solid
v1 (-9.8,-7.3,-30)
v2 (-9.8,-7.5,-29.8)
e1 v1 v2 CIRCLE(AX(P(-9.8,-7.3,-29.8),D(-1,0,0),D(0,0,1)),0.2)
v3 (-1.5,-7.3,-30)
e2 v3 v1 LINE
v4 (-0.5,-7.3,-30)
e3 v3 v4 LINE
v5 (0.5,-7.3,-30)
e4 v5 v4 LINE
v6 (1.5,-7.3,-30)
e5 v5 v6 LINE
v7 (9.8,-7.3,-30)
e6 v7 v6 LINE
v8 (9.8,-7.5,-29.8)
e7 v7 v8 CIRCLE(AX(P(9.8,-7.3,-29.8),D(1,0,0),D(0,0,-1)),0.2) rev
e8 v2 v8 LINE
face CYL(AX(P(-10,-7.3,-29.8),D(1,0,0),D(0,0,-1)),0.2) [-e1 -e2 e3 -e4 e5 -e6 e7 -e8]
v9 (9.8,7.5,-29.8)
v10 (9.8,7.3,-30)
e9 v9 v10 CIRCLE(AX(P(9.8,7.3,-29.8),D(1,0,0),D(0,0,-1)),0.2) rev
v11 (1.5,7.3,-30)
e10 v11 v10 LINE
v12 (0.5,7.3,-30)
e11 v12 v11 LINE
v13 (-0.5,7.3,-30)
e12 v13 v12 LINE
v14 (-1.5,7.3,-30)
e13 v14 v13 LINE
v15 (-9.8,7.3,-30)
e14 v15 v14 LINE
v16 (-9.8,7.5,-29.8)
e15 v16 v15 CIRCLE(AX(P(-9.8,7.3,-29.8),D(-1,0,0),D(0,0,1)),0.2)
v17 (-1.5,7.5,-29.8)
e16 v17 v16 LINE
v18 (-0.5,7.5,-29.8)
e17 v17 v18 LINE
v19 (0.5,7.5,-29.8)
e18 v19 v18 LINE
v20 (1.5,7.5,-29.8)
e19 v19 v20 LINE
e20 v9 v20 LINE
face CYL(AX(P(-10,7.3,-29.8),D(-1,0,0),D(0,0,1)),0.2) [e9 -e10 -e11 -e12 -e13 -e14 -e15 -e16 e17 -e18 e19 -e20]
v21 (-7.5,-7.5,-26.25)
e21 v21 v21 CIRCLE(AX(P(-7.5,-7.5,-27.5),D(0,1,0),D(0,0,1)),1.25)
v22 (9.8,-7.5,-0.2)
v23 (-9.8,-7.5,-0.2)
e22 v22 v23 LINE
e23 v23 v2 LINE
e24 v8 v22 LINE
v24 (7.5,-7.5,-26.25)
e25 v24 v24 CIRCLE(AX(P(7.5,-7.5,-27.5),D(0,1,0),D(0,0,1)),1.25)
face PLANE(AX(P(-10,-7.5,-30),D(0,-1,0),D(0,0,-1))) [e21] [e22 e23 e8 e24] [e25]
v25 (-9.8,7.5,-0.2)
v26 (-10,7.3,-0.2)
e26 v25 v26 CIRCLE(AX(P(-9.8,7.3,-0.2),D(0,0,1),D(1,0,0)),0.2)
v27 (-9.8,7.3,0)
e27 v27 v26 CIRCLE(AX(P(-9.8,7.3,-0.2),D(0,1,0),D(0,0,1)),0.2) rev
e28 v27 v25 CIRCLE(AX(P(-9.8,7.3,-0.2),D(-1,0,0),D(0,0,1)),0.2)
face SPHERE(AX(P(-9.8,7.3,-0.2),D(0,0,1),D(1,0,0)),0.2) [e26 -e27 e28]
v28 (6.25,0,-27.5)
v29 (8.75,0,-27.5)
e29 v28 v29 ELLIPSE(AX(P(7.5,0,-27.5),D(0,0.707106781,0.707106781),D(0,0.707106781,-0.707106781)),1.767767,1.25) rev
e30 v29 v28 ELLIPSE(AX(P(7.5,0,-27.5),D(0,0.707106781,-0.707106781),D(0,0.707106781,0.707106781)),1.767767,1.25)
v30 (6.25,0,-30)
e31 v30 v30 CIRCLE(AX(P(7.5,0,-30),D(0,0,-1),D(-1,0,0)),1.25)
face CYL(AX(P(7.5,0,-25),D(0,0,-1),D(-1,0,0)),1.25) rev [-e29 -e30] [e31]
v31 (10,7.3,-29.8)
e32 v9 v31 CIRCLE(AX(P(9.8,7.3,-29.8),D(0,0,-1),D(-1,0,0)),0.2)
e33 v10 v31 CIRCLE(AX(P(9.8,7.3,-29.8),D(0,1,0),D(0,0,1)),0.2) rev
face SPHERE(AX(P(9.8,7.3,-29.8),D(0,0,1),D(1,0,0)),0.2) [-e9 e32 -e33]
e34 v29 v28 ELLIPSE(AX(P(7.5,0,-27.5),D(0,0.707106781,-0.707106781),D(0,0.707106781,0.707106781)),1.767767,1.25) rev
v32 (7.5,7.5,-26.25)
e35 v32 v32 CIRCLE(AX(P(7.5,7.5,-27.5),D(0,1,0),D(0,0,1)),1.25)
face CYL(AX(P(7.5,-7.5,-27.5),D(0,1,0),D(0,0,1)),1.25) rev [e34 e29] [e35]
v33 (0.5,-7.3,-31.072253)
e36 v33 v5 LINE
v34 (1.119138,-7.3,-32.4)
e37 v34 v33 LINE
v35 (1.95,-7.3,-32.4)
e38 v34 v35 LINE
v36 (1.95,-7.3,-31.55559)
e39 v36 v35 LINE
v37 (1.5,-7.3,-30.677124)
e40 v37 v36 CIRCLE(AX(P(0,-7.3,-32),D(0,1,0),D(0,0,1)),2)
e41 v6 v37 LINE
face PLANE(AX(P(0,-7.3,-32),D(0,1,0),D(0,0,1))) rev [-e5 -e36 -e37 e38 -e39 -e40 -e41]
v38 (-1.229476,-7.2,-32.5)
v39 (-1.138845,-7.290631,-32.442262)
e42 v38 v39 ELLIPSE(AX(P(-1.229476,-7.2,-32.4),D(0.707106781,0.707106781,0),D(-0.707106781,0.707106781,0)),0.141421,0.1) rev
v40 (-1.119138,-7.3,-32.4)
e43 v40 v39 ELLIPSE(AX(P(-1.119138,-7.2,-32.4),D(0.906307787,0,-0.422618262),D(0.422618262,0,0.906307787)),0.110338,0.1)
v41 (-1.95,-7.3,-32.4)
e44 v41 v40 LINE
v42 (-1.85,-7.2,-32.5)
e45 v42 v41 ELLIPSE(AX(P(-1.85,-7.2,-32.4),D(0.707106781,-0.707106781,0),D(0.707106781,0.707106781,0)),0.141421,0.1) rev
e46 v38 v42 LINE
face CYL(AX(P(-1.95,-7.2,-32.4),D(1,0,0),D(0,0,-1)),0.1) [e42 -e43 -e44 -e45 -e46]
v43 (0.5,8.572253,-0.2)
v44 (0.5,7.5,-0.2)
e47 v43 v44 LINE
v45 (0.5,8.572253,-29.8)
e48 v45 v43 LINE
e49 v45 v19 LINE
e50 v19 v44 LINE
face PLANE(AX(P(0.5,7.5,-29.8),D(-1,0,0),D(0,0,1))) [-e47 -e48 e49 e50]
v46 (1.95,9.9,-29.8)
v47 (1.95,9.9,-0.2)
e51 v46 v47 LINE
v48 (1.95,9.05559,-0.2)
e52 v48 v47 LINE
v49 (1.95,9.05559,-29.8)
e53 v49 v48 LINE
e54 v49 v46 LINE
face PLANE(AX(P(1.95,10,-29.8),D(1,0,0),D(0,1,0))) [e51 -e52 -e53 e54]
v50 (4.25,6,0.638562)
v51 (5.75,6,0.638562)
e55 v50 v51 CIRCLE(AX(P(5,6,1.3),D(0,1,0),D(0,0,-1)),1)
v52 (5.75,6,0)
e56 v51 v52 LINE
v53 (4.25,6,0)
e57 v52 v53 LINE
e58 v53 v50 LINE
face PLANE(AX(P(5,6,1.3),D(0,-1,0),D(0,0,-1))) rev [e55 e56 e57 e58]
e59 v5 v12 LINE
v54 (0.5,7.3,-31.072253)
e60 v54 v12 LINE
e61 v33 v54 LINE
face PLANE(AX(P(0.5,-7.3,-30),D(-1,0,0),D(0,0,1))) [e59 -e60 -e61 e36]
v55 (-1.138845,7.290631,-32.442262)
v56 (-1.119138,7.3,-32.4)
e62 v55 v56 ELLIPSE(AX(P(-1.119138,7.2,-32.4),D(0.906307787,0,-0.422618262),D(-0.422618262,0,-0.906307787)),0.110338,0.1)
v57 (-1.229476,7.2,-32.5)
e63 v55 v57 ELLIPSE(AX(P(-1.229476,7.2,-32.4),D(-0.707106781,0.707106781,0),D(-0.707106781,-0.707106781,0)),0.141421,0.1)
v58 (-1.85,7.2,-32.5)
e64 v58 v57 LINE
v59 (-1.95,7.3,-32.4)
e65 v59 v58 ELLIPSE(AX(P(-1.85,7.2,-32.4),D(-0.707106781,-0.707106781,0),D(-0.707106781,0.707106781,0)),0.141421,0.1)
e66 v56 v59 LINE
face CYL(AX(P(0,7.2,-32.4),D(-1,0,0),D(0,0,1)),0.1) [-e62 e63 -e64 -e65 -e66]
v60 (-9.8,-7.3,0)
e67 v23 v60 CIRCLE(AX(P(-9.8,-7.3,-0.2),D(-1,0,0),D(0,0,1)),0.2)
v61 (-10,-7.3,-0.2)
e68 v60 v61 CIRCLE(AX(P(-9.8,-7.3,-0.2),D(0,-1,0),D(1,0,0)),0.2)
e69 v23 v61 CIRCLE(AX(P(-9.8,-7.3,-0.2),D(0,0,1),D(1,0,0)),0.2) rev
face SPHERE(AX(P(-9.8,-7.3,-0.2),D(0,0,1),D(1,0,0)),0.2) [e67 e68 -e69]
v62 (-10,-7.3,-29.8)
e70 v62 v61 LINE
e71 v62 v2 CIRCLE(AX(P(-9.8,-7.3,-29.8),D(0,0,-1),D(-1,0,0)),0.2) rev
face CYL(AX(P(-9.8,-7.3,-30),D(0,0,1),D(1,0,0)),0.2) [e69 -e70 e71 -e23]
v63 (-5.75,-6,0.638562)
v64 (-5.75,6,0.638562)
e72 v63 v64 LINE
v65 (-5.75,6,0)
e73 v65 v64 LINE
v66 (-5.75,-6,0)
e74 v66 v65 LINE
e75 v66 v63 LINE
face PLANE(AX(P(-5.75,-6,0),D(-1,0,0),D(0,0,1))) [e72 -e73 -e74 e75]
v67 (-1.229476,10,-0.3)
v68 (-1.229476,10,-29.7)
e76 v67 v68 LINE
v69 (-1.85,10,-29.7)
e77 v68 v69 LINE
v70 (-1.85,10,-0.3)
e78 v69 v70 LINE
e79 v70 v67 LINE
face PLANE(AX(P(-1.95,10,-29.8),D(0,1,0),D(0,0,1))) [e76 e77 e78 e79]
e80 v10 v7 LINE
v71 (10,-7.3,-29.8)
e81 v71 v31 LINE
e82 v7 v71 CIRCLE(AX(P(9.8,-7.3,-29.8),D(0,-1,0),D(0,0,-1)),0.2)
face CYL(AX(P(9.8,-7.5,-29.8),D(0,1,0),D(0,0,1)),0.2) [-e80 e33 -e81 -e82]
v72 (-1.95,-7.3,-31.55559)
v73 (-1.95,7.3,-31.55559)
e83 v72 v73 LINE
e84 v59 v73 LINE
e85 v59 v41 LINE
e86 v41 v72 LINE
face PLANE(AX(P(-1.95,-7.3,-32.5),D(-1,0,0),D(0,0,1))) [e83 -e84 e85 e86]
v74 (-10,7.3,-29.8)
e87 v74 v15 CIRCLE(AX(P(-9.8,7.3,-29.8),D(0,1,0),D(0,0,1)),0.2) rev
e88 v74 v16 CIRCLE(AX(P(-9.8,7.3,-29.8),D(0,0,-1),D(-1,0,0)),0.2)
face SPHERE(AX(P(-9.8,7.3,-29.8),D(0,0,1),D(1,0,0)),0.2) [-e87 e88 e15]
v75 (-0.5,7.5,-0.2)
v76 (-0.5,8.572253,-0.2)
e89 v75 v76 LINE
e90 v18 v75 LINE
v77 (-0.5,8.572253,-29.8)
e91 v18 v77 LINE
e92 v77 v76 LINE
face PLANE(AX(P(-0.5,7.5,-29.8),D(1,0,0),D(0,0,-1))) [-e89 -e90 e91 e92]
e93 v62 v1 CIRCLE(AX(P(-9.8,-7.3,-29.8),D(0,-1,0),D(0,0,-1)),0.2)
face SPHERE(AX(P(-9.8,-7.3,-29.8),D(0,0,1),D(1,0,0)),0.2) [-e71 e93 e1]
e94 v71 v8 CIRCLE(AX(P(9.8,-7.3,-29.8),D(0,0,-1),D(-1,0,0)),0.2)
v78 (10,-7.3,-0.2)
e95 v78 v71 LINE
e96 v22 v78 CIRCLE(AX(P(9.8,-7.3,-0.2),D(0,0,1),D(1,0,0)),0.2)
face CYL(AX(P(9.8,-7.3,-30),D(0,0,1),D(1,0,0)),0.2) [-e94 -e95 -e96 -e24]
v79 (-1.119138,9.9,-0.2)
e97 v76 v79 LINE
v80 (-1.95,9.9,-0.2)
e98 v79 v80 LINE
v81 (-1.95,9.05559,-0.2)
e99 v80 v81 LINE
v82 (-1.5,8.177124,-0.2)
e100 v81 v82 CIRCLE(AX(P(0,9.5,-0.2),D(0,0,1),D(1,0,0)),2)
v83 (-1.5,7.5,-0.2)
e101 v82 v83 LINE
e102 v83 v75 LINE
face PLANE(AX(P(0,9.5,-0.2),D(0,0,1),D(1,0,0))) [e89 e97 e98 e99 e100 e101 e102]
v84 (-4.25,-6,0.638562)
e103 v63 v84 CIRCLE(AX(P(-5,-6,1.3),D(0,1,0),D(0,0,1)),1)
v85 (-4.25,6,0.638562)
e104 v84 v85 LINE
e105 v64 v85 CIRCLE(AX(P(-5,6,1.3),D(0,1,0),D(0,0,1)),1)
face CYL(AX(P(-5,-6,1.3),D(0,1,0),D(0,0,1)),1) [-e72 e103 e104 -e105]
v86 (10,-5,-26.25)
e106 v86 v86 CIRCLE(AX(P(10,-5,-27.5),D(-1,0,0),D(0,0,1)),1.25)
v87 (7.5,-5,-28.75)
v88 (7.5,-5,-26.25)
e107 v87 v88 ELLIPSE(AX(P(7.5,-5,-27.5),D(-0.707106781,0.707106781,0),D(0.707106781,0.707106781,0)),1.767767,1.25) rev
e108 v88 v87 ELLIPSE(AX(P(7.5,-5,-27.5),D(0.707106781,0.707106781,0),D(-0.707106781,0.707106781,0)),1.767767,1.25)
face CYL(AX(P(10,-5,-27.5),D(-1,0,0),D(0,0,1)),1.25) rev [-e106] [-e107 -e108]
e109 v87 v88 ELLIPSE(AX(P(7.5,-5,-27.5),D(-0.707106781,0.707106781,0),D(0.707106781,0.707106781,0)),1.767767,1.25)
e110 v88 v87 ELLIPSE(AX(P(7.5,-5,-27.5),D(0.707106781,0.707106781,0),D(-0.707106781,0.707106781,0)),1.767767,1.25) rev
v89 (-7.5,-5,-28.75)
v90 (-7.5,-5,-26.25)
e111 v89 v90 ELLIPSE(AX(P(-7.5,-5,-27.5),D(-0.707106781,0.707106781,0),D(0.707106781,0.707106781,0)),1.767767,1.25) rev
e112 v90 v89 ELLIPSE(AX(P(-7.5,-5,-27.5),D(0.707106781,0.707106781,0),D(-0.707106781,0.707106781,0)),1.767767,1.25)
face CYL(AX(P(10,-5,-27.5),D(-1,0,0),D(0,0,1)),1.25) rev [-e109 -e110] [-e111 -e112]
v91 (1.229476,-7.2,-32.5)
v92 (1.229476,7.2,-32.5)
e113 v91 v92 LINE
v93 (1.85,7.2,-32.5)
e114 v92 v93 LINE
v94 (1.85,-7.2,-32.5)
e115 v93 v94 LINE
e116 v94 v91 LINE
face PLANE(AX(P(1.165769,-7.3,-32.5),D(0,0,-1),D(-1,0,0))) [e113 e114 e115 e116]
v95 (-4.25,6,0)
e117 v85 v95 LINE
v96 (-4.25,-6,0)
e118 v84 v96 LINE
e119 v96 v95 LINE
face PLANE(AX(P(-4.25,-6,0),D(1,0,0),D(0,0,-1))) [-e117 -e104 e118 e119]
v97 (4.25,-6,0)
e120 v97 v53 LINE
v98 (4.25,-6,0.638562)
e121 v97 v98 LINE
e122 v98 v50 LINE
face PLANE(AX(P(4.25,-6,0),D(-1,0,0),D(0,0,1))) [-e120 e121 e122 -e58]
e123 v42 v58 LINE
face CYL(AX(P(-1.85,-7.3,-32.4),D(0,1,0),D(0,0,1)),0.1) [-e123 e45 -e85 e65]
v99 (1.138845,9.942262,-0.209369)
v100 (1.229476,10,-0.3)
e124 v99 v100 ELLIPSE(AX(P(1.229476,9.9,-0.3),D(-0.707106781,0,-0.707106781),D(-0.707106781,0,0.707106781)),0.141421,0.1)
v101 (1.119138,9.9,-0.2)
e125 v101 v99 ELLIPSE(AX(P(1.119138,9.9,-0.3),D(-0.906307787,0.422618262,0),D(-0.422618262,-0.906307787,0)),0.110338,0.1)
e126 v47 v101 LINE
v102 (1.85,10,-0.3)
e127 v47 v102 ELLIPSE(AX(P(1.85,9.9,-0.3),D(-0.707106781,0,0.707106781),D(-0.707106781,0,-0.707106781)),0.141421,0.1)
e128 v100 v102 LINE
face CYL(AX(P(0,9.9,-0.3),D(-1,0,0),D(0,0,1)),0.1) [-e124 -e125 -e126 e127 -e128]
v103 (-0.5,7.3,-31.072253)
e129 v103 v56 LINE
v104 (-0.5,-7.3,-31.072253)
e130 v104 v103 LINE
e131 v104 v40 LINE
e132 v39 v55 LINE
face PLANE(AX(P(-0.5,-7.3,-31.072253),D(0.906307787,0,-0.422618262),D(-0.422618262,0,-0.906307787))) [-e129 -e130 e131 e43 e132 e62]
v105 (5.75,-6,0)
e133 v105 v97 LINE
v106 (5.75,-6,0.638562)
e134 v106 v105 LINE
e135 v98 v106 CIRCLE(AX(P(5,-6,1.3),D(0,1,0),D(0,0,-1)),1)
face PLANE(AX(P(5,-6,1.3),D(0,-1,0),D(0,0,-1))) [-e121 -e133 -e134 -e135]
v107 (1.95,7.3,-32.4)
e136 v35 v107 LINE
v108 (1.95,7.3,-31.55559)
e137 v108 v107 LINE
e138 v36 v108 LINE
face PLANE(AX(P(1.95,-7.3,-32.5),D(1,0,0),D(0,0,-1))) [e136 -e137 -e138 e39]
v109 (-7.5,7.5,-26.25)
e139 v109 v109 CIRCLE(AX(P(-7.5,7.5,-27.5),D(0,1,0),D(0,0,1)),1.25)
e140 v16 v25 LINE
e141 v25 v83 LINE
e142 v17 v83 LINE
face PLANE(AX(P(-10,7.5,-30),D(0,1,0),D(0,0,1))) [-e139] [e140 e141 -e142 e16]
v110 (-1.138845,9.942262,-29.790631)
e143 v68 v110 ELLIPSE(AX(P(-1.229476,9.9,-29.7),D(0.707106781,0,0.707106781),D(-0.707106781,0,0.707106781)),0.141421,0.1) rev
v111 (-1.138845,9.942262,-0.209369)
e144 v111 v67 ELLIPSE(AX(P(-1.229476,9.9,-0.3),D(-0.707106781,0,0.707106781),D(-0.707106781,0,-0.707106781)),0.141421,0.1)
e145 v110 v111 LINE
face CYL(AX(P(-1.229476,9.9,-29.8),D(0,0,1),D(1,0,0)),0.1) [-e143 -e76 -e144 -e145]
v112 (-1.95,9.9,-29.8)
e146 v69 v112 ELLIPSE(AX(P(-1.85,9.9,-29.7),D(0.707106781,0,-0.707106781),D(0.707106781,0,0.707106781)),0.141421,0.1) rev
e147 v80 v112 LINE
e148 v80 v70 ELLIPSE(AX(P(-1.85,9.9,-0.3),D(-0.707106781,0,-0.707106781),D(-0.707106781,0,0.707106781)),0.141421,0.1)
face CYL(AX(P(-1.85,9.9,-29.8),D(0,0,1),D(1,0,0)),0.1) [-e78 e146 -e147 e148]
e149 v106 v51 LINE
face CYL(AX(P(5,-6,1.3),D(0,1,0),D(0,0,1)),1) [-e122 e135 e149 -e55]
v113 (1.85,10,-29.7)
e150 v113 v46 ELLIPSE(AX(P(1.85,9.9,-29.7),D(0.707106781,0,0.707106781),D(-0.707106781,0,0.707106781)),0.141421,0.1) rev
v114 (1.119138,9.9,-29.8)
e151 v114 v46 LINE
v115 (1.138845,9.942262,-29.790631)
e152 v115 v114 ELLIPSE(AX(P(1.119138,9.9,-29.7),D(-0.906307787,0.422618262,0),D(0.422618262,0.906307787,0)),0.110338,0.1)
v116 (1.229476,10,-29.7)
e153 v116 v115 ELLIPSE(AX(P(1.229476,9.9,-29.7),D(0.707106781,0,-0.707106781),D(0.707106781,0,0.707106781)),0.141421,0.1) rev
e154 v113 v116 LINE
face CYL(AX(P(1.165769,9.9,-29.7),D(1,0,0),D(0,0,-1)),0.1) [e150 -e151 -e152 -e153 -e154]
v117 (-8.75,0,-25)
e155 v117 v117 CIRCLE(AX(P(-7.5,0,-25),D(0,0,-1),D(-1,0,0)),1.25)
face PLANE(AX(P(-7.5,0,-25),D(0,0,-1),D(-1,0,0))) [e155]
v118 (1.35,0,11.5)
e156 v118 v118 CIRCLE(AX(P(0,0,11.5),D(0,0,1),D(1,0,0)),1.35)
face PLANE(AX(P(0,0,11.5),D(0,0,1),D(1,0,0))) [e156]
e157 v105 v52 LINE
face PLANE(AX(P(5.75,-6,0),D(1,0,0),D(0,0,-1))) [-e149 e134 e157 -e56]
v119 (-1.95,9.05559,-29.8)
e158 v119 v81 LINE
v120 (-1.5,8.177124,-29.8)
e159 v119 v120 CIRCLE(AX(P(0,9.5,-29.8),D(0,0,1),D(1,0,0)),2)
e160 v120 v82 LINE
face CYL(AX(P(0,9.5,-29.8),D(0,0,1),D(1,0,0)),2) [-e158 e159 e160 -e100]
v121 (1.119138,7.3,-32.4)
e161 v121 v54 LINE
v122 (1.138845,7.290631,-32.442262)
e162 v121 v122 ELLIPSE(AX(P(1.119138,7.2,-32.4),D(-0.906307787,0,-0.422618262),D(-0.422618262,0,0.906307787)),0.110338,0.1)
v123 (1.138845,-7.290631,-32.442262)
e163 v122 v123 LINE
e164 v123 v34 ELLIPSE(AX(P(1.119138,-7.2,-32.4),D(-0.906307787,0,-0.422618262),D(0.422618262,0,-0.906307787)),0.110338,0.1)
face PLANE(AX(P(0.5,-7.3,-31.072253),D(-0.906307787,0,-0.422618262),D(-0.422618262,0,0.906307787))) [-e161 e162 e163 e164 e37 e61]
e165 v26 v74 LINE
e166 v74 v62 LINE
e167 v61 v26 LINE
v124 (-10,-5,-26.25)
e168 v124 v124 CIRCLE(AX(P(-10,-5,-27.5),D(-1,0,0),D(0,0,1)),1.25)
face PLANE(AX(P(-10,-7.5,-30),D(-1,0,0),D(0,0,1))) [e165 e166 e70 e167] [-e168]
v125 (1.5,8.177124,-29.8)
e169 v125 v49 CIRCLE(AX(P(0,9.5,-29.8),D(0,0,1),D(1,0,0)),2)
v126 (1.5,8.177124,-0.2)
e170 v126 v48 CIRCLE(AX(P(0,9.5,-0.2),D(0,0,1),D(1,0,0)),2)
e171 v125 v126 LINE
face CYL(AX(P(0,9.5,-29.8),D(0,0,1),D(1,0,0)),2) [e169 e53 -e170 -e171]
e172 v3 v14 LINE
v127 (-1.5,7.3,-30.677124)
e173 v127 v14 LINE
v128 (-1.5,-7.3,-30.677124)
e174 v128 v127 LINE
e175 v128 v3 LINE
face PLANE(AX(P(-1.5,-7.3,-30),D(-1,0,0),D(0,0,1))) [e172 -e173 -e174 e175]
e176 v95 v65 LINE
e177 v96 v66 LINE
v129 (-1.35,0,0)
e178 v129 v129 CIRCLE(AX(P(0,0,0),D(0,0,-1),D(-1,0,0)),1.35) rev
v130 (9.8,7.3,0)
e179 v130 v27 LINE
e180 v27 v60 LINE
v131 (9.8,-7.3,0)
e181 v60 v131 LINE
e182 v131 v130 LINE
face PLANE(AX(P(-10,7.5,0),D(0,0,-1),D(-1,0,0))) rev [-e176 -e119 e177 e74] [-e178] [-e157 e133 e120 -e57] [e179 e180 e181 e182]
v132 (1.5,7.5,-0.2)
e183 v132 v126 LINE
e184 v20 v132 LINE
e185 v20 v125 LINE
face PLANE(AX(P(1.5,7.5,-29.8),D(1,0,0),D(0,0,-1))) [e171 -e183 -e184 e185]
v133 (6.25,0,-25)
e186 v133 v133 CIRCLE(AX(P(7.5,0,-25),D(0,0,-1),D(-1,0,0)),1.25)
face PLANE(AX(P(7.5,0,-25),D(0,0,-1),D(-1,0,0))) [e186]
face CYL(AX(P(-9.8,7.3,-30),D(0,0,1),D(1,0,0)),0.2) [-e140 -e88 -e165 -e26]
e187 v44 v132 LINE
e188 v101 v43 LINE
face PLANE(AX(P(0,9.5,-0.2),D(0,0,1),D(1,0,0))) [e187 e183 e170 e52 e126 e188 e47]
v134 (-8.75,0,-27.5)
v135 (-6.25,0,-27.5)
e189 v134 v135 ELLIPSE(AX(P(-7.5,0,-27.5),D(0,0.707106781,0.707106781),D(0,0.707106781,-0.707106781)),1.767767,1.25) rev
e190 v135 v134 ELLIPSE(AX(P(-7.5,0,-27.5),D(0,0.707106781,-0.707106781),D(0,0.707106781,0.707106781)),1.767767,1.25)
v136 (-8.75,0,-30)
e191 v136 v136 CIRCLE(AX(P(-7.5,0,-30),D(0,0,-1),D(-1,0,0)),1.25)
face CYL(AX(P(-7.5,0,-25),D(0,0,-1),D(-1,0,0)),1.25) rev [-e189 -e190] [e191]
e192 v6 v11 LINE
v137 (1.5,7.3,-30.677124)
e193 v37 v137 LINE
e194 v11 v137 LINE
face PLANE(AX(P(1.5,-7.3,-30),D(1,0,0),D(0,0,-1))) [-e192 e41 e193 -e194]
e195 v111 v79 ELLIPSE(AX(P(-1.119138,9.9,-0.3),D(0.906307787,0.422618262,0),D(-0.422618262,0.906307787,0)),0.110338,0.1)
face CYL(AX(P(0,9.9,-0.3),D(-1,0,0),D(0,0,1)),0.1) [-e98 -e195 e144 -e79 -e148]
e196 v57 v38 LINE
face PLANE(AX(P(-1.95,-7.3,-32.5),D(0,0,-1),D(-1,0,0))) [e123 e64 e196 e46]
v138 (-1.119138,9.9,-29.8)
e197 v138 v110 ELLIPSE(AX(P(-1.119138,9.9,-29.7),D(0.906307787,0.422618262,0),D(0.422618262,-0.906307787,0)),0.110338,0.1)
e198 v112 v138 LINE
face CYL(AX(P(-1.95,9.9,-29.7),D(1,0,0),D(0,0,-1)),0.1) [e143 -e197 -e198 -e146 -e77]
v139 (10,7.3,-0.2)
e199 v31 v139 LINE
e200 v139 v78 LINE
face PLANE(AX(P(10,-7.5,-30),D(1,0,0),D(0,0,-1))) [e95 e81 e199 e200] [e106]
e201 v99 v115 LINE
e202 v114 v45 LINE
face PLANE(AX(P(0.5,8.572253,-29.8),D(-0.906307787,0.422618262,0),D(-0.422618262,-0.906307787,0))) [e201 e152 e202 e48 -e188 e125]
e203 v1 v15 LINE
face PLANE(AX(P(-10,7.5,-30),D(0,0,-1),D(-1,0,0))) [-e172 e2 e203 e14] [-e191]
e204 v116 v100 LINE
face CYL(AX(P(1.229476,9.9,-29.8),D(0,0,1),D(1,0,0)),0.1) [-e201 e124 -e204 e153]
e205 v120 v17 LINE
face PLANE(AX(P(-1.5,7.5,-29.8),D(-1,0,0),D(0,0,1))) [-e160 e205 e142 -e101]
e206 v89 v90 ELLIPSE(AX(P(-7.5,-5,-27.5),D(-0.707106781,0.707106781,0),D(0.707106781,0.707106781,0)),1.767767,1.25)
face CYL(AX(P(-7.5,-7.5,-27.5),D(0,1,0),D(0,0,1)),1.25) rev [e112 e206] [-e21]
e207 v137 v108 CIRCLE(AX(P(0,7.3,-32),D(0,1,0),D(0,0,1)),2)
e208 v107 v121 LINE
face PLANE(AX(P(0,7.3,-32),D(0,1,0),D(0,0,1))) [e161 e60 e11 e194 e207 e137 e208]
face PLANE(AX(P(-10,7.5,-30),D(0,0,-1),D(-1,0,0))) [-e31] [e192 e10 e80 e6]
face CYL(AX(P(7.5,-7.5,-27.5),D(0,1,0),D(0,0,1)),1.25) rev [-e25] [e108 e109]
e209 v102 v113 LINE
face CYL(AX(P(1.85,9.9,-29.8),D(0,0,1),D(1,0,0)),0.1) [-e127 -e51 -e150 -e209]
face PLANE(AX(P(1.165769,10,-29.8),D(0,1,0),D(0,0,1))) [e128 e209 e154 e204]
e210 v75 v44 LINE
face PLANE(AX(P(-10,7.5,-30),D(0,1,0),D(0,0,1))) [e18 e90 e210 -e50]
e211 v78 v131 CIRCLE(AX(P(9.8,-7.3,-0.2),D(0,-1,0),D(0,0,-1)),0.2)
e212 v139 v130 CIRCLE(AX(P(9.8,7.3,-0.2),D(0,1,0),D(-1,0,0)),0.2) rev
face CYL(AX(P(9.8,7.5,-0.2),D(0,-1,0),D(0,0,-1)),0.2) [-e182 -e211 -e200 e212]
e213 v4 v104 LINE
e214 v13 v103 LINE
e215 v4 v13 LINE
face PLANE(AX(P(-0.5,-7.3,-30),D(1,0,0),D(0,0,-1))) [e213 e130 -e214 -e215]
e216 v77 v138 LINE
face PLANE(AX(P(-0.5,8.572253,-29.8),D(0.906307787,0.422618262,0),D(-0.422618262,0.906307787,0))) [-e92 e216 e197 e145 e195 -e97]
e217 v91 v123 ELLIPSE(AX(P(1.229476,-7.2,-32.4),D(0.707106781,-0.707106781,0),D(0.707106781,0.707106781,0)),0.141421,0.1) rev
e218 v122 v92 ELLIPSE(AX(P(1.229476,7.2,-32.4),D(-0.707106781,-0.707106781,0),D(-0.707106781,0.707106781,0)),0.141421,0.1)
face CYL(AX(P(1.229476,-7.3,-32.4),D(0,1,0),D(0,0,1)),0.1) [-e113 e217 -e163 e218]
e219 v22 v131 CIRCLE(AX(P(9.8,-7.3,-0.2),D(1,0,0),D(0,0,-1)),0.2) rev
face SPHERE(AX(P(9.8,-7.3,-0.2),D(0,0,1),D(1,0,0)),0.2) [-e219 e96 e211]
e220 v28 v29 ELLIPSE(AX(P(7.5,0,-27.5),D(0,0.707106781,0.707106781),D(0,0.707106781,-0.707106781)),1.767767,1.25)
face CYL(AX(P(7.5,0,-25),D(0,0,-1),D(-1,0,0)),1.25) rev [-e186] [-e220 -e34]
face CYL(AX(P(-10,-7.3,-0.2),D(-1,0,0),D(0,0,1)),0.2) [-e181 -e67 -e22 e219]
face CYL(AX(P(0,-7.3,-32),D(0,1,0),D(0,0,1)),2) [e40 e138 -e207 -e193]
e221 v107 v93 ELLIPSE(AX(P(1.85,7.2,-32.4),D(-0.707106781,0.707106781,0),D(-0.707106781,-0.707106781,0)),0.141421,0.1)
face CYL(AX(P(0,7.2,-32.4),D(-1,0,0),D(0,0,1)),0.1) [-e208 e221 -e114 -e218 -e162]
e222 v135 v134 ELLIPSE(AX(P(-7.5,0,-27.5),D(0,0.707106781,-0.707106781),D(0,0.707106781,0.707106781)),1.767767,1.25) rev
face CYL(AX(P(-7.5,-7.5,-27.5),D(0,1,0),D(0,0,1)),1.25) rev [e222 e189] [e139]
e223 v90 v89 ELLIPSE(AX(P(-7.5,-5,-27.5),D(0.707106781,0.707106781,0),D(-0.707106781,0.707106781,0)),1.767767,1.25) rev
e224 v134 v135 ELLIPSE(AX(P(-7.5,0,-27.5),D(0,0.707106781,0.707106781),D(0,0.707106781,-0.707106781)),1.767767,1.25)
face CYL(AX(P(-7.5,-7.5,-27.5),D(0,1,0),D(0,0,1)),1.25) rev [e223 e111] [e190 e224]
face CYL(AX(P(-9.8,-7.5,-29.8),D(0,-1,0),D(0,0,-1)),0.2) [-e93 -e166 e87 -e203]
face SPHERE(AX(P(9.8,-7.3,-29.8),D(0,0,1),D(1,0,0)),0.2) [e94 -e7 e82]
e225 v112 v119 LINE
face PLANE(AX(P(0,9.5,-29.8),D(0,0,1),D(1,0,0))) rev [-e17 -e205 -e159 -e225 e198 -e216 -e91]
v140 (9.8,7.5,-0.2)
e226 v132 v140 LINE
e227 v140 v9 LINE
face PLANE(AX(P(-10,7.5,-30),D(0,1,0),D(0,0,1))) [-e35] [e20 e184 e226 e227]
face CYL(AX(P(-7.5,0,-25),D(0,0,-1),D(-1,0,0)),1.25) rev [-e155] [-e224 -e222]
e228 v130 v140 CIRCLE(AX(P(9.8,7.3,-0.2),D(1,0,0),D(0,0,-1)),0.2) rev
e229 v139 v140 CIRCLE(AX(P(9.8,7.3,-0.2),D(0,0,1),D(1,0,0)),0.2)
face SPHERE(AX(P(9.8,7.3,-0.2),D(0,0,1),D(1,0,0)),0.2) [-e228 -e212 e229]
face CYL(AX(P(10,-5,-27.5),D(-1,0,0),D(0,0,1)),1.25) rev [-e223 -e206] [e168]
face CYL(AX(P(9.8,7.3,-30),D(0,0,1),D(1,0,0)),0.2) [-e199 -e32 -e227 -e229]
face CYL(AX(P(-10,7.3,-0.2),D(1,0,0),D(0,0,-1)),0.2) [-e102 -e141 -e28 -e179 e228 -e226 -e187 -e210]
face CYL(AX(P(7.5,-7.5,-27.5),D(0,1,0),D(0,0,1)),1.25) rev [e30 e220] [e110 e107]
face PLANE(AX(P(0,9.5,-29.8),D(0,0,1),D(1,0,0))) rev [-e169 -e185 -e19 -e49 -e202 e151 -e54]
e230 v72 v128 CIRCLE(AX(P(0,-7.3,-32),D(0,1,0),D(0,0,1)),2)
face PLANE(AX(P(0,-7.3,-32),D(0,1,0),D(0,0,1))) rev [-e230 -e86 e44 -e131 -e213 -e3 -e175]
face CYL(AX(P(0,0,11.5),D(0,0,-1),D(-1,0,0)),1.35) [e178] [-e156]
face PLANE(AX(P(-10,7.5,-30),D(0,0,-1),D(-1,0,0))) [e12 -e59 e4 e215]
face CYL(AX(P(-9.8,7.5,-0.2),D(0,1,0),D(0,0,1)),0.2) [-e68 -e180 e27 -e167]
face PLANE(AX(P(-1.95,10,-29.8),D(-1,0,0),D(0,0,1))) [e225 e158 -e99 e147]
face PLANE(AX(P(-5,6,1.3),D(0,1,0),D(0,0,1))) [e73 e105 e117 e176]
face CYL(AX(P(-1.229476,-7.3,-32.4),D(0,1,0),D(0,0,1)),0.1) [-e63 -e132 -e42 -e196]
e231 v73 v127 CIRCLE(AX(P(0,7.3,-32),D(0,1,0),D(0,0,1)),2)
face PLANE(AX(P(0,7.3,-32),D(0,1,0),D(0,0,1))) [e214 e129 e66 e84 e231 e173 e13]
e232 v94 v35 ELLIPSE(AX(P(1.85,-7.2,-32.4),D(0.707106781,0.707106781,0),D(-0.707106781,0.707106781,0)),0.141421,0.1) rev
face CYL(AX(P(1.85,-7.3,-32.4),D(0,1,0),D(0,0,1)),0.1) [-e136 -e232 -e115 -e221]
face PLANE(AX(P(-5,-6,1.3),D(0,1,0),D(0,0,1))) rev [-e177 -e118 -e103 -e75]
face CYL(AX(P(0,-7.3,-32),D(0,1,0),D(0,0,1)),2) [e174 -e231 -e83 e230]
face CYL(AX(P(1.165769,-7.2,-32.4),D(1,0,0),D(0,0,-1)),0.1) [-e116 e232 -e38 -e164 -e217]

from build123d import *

# Parameters (mm, degrees)
SKETCH_1_W           = 20
SKETCH_1_H           = 15
EXTRUDE_1_DEPTH      = 30
EXTRUDE_2_DEPTH      = 6
EXTRUDE_2_DEPTH_BACK = 6
SKETCH_3_R           = 1.35
EXTRUDE_3_DEPTH      = 11.5
EXTRUDE_START        = -0.2
EXTRUDE_4_DEPTH      = 29.6
EXTRUDE_5_DEPTH      = 14.6
FILLET_1_R           = 0.1
FILLET_2_R           = 0.2
SKETCH_6_R           = 1.25
CUT_EXTRUDE_1_DEPTH  = 38.165171868
SKETCH_7_R           = 1.25
CUT_EXTRUDE_2_DEPTH  = 40.449334595
SKETCH_8_R           = 1.25
CUT_EXTRUDE_3_DEPTH  = 5


with BuildPart() as part:
    # 草图1 → 凸台-拉伸1 (new body)
    with BuildSketch(Plane.XY):
        Rectangle(SKETCH_1_W, SKETCH_1_H)
    extrude(amount=-EXTRUDE_1_DEPTH)

    # 草图2 → 凸台-拉伸2 (add, two sides: drawn at the far end of the back side and taken through both)
    with BuildSketch(Plane(origin=(0, 0, 0), x_dir=(1, 0, 0), z_dir=(0, 1, 0)).offset(-EXTRUDE_2_DEPTH_BACK)):
        with BuildLine():
            Line((-4.25, 0), (-5.75, 0))
            Line((-5.75, 0), (-5.75, -0.638562172))
            ThreePointArc((-5.75, -0.638562172), (-5, -2.3), (-4.25, -0.638562172))
            Line((-4.25, -0.638562172), (-4.25, 0))
        make_face()
        with BuildLine():
            Line((4.25, 0), (4.25, -0.638562172))
            ThreePointArc((4.25, -0.638562172), (5, -2.3), (5.75, -0.638562172))
            Line((5.75, -0.638562172), (5.75, 0))
            Line((5.75, 0), (4.25, 0))
        make_face()
    extrude(amount=EXTRUDE_2_DEPTH + EXTRUDE_2_DEPTH_BACK)

    # 草图3 → 凸台-拉伸3 (add)
    with BuildSketch(Plane.XY):
        with Locations(Location((0, 0, 0), (0, 0, 180))):
            Circle(SKETCH_3_R)
    extrude(amount=EXTRUDE_3_DEPTH)

    # 草图4 → 凸台-拉伸4 (add)
    with BuildSketch(Plane.XY.offset(EXTRUDE_START)):
        with BuildLine():
            Line((-1.5, 7.5), (-1.5, 8.177124344))
            ThreePointArc((-1.5, 8.177124344), (-1.780042303, 8.588161527), (-1.95, 9.055590279))
            Line((-1.95, 9.055590279), (-1.95, 10))
            Line((-1.95, 10), (-1.165769145, 10))
            Line((-1.165769145, 10), (-0.5, 8.57225346))
            Line((-0.5, 8.57225346), (-0.5, 7.5))
            Line((-0.5, 7.5), (-1.5, 7.5))
        make_face()
        with BuildLine():
            Line((1.5, 7.5), (1.5, 8.177124344))
            ThreePointArc((1.5, 8.177124344), (1.780042303, 8.588161527), (1.95, 9.055590279))
            Line((1.95, 9.055590279), (1.95, 10))
            Line((1.95, 10), (1.165769145, 10))
            Line((1.165769145, 10), (0.5, 8.57225346))
            Line((0.5, 8.57225346), (0.5, 7.5))
            Line((0.5, 7.5), (1.5, 7.5))
        make_face()
    extrude(amount=-EXTRUDE_4_DEPTH)

    # 草图5 → 凸台-拉伸5 (add)
    with BuildSketch(Plane(origin=(0, 7.5, 0), x_dir=(-1, 0, 0), z_dir=(0, 1, 0)).offset(EXTRUDE_START)):
        with BuildLine():
            Line((1.5, -30), (1.5, -30.677124344))
            ThreePointArc((1.5, -30.677124344), (1.780042303, -31.088161527), (1.95, -31.555590279))
            Line((1.95, -31.555590279), (1.95, -32.5))
            Line((1.95, -32.5), (1.165769145, -32.5))
            Line((1.165769145, -32.5), (0.5, -31.07225346))
            Line((0.5, -31.07225346), (0.5, -30))
            Line((0.5, -30), (1.5, -30))
        make_face()
        with BuildLine():
            Line((-1.5, -30), (-1.5, -30.677124344))
            ThreePointArc((-1.5, -30.677124344), (-1.780042303, -31.088161527), (-1.95, -31.555590279))
            Line((-1.95, -31.555590279), (-1.95, -32.5))
            Line((-1.95, -32.5), (-1.165769145, -32.5))
            Line((-1.165769145, -32.5), (-0.5, -31.07225346))
            Line((-0.5, -31.07225346), (-0.5, -30))
            Line((-0.5, -30), (-1.5, -30))
        make_face()
    extrude(amount=-EXTRUDE_5_DEPTH)

    # 圆角1
    fillet_1_edges = [part.edges().sort_by_distance(p)[0] for p in [
        (-1.557884573, -7.3, -32.5),
        (-1.95, 0, -32.5),
        (-1.165769145, 0, -32.5),
        (-1.557884573, 7.3, -32.5),
        (-1.557884573, 10, -29.8),
        (-1.95, 10, -15),
        (-1.165769145, 10, -15),
        (-1.557884573, 10, -0.2),
        (1.557884573, 10, -29.8),
        (1.165769145, 10, -15),
        (1.95, 10, -15),
        (1.557884573, 10, -0.2),
        (1.557884573, -7.3, -32.5),
        (1.165769145, 0, -32.5),
        (1.95, 0, -32.5),
        (1.557884573, 7.3, -32.5),
    ]]
    fillet(fillet_1_edges, radius=FILLET_1_R)

    # 圆角2
    fillet_2_edges = [part.edges().sort_by_distance(p)[0] for p in [
        (10, 0, -30),
        (0, 7.5, -30),
        (-10, 0, -30),
        (0, 7.5, 0),
        (10, 0, 0),
        (0, -7.5, 0),
        (-10, 0, 0),
        (0, -7.5, -30),
        (-10, 7.5, -15),
        (10, 7.5, -15),
        (10, -7.5, -15),
        (-10, -7.5, -15),
    ]]
    fillet(fillet_2_edges, radius=FILLET_2_R - 0.0001)  # a hair under: the kernel refuses the full size

    # 草图6 → 切除-拉伸1 (cut, through all)
    with BuildSketch(Plane(origin=(0, 7.5, 0), x_dir=(-1, 0, 0), z_dir=(0, 1, 0))):
        with Locations(Location((7.5, -27.5, 0), (0, 0, 90))):
            Circle(SKETCH_6_R)
        with Locations(Location((-7.5, -27.5, 0), (0, 0, 90))):
            Circle(SKETCH_6_R)
    extrude(amount=-CUT_EXTRUDE_1_DEPTH, mode=Mode.SUBTRACT)

    # 草图7 → 切除-拉伸2 (cut, through all)
    with BuildSketch(Plane.ZY.offset(10)):
        with Locations((-27.5, -5)):
            Circle(SKETCH_7_R)
    extrude(amount=-CUT_EXTRUDE_2_DEPTH, mode=Mode.SUBTRACT)

    # 草图8 → 切除-拉伸3 (cut)
    with BuildSketch(Plane(origin=(0, 0, -30), x_dir=(-1, 0, 0), z_dir=(0, 0, -1))):
        with Locations((-7.5, 0)):
            Circle(SKETCH_8_R)
        with Locations((7.5, 0)):
            Circle(SKETCH_8_R)
    extrude(amount=-CUT_EXTRUDE_3_DEPTH, mode=Mode.SUBTRACT)


solid = part.part
